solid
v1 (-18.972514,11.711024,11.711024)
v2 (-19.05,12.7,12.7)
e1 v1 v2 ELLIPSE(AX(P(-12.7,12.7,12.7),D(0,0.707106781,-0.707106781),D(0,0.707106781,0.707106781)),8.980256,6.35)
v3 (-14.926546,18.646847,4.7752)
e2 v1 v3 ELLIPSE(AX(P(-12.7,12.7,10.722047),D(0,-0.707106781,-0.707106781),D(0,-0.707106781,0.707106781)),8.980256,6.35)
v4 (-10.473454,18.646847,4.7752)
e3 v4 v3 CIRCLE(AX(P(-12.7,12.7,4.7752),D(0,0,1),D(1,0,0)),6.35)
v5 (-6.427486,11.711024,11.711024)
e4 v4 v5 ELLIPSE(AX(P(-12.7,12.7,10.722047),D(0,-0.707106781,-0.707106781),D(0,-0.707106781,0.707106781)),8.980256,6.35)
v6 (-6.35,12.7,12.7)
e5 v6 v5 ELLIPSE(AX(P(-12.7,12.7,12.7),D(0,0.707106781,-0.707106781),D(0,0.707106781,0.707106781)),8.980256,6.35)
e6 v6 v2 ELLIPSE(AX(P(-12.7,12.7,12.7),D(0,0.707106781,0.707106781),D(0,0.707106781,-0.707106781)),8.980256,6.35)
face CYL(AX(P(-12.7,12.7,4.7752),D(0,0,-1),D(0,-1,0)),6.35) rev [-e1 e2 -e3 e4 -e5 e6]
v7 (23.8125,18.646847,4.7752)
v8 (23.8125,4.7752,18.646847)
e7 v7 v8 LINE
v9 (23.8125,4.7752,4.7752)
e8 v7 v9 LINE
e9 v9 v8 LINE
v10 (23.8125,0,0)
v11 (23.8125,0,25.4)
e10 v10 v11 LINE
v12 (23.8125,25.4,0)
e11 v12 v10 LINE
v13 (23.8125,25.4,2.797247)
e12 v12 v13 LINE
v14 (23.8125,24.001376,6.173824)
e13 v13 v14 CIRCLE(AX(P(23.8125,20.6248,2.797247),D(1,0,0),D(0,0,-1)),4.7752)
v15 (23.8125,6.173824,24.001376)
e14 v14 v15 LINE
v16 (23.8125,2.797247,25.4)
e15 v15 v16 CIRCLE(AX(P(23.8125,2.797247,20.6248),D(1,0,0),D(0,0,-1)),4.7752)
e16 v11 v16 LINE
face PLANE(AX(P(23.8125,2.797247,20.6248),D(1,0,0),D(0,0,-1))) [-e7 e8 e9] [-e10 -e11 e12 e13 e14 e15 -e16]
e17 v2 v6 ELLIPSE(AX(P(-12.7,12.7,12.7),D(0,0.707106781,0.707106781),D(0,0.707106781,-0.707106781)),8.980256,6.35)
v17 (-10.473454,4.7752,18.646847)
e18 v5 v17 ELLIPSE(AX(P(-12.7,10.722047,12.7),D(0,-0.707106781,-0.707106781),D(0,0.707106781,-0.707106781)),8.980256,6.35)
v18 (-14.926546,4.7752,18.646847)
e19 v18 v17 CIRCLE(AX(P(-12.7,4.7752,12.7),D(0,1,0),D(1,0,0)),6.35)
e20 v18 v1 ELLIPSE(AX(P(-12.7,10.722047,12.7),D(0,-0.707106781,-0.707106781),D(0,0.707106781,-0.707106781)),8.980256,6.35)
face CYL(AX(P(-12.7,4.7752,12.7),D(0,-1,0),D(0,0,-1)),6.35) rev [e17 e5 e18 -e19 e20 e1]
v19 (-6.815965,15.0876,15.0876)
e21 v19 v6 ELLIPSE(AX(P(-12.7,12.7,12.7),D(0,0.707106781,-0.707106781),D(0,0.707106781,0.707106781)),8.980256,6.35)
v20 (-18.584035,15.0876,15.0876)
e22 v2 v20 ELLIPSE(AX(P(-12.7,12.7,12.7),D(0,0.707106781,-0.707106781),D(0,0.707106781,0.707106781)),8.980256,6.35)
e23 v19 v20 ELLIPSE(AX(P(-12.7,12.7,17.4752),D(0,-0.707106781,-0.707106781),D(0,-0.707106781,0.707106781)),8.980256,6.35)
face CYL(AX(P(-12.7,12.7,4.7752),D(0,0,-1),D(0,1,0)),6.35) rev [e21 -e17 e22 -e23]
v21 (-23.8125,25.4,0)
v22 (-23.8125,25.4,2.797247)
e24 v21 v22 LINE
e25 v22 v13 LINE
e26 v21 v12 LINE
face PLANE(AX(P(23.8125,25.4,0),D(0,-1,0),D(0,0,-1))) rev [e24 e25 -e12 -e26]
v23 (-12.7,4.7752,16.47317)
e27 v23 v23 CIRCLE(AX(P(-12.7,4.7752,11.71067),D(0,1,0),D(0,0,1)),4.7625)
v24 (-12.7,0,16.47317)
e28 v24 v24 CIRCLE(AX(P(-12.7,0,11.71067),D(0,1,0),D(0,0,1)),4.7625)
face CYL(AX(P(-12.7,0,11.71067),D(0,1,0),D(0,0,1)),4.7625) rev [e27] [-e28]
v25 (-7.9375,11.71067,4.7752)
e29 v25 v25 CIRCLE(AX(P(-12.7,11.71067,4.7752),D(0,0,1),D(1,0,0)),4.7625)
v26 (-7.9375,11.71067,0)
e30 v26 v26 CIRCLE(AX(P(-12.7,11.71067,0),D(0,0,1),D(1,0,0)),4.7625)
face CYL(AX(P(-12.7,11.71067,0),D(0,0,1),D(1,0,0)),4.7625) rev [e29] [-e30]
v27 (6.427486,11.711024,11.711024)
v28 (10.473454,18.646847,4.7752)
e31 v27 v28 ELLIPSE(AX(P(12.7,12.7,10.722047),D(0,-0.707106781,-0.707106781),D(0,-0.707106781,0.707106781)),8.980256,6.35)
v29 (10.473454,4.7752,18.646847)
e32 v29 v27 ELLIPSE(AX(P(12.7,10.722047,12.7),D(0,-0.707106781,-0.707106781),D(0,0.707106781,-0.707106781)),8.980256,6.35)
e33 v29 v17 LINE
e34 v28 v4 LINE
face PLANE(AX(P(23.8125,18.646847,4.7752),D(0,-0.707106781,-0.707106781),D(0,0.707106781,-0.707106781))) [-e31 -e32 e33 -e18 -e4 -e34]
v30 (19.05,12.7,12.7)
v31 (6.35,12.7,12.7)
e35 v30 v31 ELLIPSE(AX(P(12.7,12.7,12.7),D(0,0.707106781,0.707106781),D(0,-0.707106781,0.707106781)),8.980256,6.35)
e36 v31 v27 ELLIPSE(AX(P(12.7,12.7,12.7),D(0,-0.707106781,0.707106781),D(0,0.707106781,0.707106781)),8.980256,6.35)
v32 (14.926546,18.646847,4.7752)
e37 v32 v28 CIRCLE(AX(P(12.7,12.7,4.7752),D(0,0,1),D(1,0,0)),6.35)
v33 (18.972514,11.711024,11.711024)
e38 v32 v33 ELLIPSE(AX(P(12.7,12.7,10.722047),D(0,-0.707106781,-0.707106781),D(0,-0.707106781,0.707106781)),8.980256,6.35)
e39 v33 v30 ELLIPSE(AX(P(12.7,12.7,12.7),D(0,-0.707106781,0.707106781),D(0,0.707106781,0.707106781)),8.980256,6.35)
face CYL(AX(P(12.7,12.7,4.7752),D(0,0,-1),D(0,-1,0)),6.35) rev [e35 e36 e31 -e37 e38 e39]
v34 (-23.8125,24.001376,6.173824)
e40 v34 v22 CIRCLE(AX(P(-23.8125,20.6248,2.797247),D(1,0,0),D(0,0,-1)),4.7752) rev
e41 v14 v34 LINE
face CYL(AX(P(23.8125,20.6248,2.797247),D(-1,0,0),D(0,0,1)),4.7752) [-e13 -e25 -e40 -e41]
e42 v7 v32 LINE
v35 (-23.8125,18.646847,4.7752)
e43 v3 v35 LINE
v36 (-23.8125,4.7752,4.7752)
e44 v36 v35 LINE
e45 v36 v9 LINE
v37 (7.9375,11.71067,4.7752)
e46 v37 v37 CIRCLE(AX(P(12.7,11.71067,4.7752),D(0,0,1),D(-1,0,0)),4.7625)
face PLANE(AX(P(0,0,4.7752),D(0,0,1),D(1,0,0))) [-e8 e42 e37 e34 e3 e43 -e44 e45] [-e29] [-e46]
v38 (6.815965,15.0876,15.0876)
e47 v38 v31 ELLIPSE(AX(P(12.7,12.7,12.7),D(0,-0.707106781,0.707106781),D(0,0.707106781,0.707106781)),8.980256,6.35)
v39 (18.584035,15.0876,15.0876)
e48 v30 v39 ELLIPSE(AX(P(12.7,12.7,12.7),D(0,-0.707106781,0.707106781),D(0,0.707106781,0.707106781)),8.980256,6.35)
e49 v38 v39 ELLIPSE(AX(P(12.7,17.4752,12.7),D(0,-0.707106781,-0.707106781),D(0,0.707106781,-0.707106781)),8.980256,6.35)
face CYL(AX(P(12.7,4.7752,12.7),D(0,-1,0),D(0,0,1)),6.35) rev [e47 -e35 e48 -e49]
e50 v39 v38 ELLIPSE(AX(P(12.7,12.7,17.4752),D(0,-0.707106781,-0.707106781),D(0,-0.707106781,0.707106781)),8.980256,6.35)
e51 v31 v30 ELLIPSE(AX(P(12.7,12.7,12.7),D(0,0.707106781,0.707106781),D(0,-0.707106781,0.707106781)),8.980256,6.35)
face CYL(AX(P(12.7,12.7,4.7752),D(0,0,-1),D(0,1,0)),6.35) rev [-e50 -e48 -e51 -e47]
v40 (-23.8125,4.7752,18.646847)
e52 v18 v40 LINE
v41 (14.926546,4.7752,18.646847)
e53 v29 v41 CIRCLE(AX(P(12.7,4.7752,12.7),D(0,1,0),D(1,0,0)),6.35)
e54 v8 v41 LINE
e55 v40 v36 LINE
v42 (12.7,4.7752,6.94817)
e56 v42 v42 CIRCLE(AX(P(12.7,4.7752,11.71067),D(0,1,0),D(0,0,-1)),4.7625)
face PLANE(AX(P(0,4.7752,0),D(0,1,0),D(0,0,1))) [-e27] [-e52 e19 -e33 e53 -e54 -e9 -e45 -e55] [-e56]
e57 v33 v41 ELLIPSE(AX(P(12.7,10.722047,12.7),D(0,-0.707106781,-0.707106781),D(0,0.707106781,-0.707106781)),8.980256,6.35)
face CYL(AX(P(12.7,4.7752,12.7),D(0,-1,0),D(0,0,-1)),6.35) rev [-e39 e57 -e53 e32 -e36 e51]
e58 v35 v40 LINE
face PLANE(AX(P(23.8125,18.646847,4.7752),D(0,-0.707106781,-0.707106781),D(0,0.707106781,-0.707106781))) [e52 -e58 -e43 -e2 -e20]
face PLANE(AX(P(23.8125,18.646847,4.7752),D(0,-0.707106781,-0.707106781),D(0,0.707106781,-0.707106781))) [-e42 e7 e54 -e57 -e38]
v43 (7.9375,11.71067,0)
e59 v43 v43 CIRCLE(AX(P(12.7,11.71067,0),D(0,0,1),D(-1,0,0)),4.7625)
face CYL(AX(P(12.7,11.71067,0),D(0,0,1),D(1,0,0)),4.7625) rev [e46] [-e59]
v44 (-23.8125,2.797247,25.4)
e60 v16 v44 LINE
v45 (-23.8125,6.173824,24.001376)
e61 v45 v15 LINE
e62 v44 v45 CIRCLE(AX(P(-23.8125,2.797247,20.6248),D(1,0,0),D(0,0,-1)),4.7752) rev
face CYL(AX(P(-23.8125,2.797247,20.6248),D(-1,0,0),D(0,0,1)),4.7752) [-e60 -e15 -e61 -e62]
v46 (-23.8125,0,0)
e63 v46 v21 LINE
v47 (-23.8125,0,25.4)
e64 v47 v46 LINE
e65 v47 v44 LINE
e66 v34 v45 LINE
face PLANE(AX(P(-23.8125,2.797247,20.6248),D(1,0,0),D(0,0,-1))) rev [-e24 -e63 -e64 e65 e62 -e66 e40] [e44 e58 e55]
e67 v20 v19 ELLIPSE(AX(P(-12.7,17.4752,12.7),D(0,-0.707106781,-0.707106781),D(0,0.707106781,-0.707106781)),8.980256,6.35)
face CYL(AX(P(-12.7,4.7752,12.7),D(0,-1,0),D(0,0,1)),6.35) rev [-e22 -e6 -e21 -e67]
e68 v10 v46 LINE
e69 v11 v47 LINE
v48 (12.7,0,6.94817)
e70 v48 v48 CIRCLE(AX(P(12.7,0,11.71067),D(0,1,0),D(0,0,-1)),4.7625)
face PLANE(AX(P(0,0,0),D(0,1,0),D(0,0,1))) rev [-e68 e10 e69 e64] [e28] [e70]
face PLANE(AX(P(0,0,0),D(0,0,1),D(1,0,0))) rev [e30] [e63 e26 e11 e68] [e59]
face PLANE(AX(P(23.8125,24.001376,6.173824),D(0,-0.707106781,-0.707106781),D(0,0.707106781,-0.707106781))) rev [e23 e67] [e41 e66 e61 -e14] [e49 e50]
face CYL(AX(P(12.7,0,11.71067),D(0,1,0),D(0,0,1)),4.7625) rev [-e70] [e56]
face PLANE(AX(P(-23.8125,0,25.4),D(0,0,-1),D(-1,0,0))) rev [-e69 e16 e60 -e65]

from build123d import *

# Parameters (mm, degrees)
BOSS_EXTRUDE1_START     = -20.6248
BOSS_EXTRUDE1_OUTLINE_W = 47.625
BOSS_EXTRUDE1_OUTLINE_H = 20.6248
BOSS_EXTRUDE1_DEPTH     = 25.4
BOSS_EXTRUDE1_2_DEPTH   = 4.7752
BOSS_EXTRUDE1_START_2   = 4.7752
BOSS_EXTRUDE1_3_DEPTH   = 20.6248
BOSS_EXTRUDE1_START_3   = -23.8125
BOSS_EXTRUDE1_4_DEPTH   = 47.625
SKETCH2_W               = 47.625
SKETCH2_H               = 25.4
BOSS_EXTRUDE2_DEPTH     = 4.7752
FILLET1_R               = 4.7752
SKETCH4_R               = 4.7625
CUT_EXTRUDE1_DEPTH      = 41.466993109
SKETCH5_R               = 4.7625
CUT_EXTRUDE2_DEPTH      = 41.466993109


with BuildPart() as part:
    # Boss-Extrude1: read off the stored shape, not the designer's step
    # Boss-Extrude1 outline → Boss-Extrude1 (new body)
    with BuildSketch(Plane.XZ.offset(-4.7752).offset(BOSS_EXTRUDE1_START)):
        with Locations((0, 15.0876)):
            Rectangle(BOSS_EXTRUDE1_OUTLINE_W, BOSS_EXTRUDE1_OUTLINE_H)
        with BuildLine():
            ThreePointArc((-18.972513521, 11.711023698), (-12.7, 19.05), (-6.427486479, 11.711023698))
            ThreePointArc((-6.427486479, 11.711023698), (-12.7, 6.35), (-18.972513521, 11.711023698))
        make_face(mode=Mode.SUBTRACT)
        with BuildLine():
            ThreePointArc((6.427486479, 11.711023698), (12.7, 19.05), (18.972513521, 11.711023698))
            ThreePointArc((18.972513521, 11.711023698), (12.7, 6.35), (6.427486479, 11.711023698))
        make_face(mode=Mode.SUBTRACT)
    extrude(amount=BOSS_EXTRUDE1_DEPTH)

    # Boss-Extrude1 2 outline → Boss-Extrude1 2 (add)
    with BuildSketch(Plane.XZ.offset(-4.7752)):
        with BuildLine():
            ThreePointArc((-18.972513521, 11.711023698), (-12.7, 6.35), (-6.427486479, 11.711023698))
            ThreePointArc((-6.427486479, 11.711023698), (-12.7, 19.05), (-18.972513521, 11.711023698))
        make_face()
        with BuildLine():
            ThreePointArc((6.427486479, 11.711023698), (12.7, 6.35), (18.972513521, 11.711023698))
            ThreePointArc((18.972513521, 11.711023698), (12.7, 19.05), (6.427486479, 11.711023698))
        make_face()
    extrude(amount=BOSS_EXTRUDE1_2_DEPTH)

    # Boss-Extrude1 3 outline → Boss-Extrude1 3 (cut)
    with BuildSketch(Plane.XY.offset(BOSS_EXTRUDE1_START_2)):
        with BuildLine():
            ThreePointArc((18.972513521, 11.711023698), (12.7, 19.05), (6.427486479, 11.711023698))
            ThreePointArc((6.427486479, 11.711023698), (12.7, 6.35), (18.972513521, 11.711023698))
        make_face()
        with BuildLine():
            ThreePointArc((-6.427486479, 11.711023698), (-12.7, 19.05), (-18.972513521, 11.711023698))
            ThreePointArc((-18.972513521, 11.711023698), (-12.7, 6.35), (-6.427486479, 11.711023698))
        make_face()
    extrude(amount=BOSS_EXTRUDE1_3_DEPTH, mode=Mode.SUBTRACT)

    # Boss-Extrude1 4 outline → Boss-Extrude1 4 (cut)
    with BuildSketch(Plane.YZ.offset(BOSS_EXTRUDE1_START_3)):
        Polygon((25.4, 25.4), (4.7752, 25.4), (25.4, 4.7752), align=None)
        Polygon((4.7752, 4.7752), (18.646847397, 4.7752), (4.7752, 18.646847397), align=None)
    extrude(amount=BOSS_EXTRUDE1_4_DEPTH, mode=Mode.SUBTRACT)

    # Sketch2 → Boss-Extrude2 (add)
    with BuildSketch(Plane(origin=(0, 0, 4.7752), x_dir=(-1, 0, 0), z_dir=(0, 0, -1))):
        with Locations((0, 12.7)):
            Rectangle(SKETCH2_W, SKETCH2_H)
    extrude(amount=BOSS_EXTRUDE2_DEPTH)

    # Fillet1
    fillet1_edges = [part.edges().sort_by_distance(p)[0] for p in [
        (0, 25.4, 4.7752),
        (0, 4.7752, 25.4),
    ]]
    fillet(fillet1_edges, radius=FILLET1_R)

    # Sketch4 → Cut-Extrude1 (cut, through all)
    with BuildSketch(Plane.XY.offset(4.7752)):
        with Locations((-12.7, 11.71067)):
            Circle(SKETCH4_R)
        with Locations(Location((12.7, 11.71067, 0), (0, 0, 180))):
            Circle(SKETCH4_R)
    extrude(amount=-CUT_EXTRUDE1_DEPTH, mode=Mode.SUBTRACT)

    # Sketch5 → Cut-Extrude2 (cut, through all)
    with BuildSketch(Plane(origin=(0, 4.7752, 0), x_dir=(1, 0, 0), z_dir=(0, 1, 0))):
        with Locations(Location((-12.7, -11.71067, 0), (0, 0, 270))):
            Circle(SKETCH5_R)
        with Locations(Location((12.7, -11.71067, 0), (0, 0, 90))):
            Circle(SKETCH5_R)
    extrude(amount=-CUT_EXTRUDE2_DEPTH, mode=Mode.SUBTRACT)


solid = part.part
